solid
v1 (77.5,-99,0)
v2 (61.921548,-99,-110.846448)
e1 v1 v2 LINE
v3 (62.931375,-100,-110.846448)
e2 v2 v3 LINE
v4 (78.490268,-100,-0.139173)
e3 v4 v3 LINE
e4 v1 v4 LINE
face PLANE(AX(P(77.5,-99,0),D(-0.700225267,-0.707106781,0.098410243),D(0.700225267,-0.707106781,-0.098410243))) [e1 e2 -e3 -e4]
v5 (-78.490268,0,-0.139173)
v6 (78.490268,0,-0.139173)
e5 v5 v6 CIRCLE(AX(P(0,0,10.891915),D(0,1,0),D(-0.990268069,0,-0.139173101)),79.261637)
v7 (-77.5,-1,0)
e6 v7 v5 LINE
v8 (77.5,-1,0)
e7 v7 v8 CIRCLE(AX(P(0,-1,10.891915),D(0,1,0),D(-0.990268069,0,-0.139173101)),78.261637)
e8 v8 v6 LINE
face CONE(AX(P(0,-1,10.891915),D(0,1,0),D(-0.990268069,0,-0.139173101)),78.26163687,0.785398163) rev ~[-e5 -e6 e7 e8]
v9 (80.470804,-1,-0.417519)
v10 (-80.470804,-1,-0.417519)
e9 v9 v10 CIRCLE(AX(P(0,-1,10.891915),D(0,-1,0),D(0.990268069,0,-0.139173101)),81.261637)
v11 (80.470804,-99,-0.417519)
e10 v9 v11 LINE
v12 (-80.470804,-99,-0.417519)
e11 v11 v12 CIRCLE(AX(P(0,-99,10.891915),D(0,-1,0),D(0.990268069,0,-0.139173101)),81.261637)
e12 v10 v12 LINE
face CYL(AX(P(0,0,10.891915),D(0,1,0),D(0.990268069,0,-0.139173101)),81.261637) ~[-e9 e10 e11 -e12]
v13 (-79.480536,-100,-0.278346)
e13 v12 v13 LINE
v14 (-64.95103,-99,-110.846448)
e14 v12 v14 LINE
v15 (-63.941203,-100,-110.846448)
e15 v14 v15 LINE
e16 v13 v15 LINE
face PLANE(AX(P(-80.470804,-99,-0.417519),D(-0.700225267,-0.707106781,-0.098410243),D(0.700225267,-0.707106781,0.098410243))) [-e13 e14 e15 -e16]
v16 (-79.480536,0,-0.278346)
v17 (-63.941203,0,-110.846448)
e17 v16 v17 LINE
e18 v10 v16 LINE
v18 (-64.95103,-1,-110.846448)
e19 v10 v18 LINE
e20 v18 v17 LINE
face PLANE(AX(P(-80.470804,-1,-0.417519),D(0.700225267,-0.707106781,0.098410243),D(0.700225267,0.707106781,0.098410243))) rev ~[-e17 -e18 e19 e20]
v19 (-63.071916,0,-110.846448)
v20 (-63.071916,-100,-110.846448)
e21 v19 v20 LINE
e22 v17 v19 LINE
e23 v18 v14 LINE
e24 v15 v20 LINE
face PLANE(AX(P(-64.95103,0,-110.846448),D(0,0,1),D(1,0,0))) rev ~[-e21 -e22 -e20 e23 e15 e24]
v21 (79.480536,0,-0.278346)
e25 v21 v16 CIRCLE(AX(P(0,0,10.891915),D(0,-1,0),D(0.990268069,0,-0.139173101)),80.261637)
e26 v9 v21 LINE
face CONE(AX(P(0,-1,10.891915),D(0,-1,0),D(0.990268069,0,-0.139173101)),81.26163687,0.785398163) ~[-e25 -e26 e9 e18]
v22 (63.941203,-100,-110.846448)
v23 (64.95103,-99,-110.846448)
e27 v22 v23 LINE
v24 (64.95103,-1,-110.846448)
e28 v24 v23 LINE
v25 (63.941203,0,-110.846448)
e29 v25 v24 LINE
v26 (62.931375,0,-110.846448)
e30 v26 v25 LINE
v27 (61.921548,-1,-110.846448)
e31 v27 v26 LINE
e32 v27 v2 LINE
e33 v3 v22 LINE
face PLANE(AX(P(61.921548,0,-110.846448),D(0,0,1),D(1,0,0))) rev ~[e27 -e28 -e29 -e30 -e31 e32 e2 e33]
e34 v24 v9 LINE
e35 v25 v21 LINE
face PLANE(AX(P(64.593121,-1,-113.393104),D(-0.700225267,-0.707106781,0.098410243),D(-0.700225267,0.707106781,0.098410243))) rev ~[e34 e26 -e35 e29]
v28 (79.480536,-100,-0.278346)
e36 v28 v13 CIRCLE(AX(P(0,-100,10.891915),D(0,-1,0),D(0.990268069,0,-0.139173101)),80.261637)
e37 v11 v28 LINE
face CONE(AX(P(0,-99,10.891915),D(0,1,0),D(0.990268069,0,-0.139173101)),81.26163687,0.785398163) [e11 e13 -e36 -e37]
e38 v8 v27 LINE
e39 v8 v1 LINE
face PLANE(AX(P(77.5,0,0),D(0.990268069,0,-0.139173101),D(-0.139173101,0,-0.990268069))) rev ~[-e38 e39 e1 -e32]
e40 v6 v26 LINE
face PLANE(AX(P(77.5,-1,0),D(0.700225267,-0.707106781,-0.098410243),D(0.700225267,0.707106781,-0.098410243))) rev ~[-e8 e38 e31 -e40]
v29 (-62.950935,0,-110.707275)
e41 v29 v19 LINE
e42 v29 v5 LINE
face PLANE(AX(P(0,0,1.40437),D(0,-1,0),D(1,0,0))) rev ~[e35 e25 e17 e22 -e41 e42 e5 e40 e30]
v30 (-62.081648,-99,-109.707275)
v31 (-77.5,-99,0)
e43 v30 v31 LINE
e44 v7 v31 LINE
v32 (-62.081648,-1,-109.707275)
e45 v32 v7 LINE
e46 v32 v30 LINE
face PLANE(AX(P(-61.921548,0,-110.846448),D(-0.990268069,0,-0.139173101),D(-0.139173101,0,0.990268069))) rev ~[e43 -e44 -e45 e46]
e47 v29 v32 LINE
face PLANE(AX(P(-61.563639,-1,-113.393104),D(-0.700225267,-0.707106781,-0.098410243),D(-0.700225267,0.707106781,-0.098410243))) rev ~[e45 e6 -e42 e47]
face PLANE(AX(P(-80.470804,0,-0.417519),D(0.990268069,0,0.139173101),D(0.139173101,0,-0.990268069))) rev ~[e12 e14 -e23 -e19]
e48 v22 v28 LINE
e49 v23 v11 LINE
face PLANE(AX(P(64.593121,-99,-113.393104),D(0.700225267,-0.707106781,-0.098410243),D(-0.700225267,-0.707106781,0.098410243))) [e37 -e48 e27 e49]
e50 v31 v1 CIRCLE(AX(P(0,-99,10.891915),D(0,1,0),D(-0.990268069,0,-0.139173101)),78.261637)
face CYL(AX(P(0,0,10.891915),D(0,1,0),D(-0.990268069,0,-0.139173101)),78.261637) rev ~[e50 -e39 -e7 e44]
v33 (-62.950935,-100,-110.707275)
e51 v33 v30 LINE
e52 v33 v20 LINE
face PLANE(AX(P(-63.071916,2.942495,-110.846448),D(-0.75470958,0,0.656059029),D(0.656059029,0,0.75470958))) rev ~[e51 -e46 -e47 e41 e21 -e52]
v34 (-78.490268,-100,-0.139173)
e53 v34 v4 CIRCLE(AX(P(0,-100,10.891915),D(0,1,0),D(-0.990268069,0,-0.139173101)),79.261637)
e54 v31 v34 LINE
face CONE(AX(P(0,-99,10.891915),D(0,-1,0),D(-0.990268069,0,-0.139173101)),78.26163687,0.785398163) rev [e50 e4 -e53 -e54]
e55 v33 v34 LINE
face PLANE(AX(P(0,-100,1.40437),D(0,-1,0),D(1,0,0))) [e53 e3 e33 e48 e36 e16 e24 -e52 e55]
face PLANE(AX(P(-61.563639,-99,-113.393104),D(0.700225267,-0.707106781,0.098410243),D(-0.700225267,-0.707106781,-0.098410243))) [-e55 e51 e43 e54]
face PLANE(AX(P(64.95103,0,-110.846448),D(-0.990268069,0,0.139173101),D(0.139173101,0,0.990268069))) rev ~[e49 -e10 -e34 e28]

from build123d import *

# Parameters (mm, degrees)
F1_DEPTH     = 100
F2_T1_DEPTH  = 105.8849898869
F2_T3_DEPTH  = 114.5074829388
F2_T5_DEPTH  = 114.0858604347
F2_T7_DEPTH  = 114.5074829388
F2_T9_DEPTH  = 114.0858604347
F2_T12_ANGLE = 196
F2_T14_ANGLE = 196
F2_T16_ANGLE = 196
F2_T18_ANGLE = 196


# Not quite as in the source:
# - a fillet or chamfer that OpenCascade refuses, or shapes differently, is made with other operations: its cross-section is extruded or revolved along the edge and cut away or added


with BuildPart() as f1:
    # F0 (on Front) → F1 (new body)
    with BuildSketch(Plane.XZ):
        with BuildLine():
            Line((-61.9215476124, -110.8464484404), (-77.5, 0))
            ThreePointArc((-77.5, 0), (0, 89.1535515596), (77.5, 0))
            Line((77.5, 0), (61.9215476124, -110.8464484404))
            Line((61.9215476124, -110.8464484404), (64.95103033, -110.8464484404))
            Line((64.95103033, -110.8464484404), (80.4708042062, -0.4175193029))
            ThreePointArc((80.4708042062, -0.4175193029), (0, 92.1535515596), (-80.4708042062, -0.4175193029))
            Line((-80.4708042062, -0.4175193029), (-64.95103033, -110.8464484404))
            Line((-64.95103033, -110.8464484404), (-61.9215476124, -110.8464484404))
        make_face()
    extrude(amount=F1_DEPTH)

    # F2: chamfer of 1 on 17 edges, made by hand

    # F2_s2 → F2_t1 (cut)
    with BuildSketch(Plane.XZ.offset(-2.9424949434)):
        Polygon((-63.0719160196, -110.8464484404), (-62.0816479509, -109.7072753394), (-61.9215476124, -110.8464484404), align=None)
    extrude(amount=F2_T1_DEPTH, mode=Mode.SUBTRACT)

    # F2_s4 → F2_t3 (cut)
    with BuildSketch(Plane(origin=(14.4352522013, 0, -102.7121564484), x_dir=(0, 1, 0), z_dir=(-0.139173101, 0, 0.9902680687))):
        Polygon((-1, 76.7457753275), (0, 77.7457753275), (0, 76.7457753275), align=None)
        Polygon((-99, 76.7457753275), (-100, 77.7457753275), (-100, 76.7457753275), align=None)
    extrude(amount=F2_T3_DEPTH, mode=Mode.SUBTRACT)

    # F2_s6 → F2_t5 (cut)
    with BuildSketch(Plane(origin=(-1.5011092824, 0, 10.6809475379), x_dir=(0, 1, 0), z_dir=(0.139173101, 0, -0.9902680687))):
        Polygon((-1, -79.7457753275), (0, -78.7457753275), (0, -79.7457753275), align=None)
        Polygon((-99, -79.7457753275), (-100, -78.7457753275), (-100, -79.7457753275), align=None)
    extrude(amount=F2_T5_DEPTH, mode=Mode.SUBTRACT)

    # F2_s8 → F2_t7 (cut)
    with BuildSketch(Plane(origin=(1.5011092824, 0, 10.6809475379), x_dir=(0, 1, 0), z_dir=(-0.139173101, 0, -0.9902680687))):
        Polygon((-1, 76.7457753275), (0, 77.7457753275), (0, 76.7457753275), align=None)
        Polygon((-99, 76.7457753275), (-100, 77.7457753275), (-100, 76.7457753275), align=None)
    extrude(amount=F2_T7_DEPTH, mode=Mode.SUBTRACT)

    # F2_s10 → F2_t9 (cut)
    with BuildSketch(Plane(origin=(-14.37657369, 0, -102.2946371455), x_dir=(0, 1, 0), z_dir=(0.139173101, 0, 0.9902680687))):
        Polygon((-1, -79.7457753275), (0, -78.7457753275), (0, -79.7457753275), align=None)
        Polygon((-99, -79.7457753275), (-100, -78.7457753275), (-100, -79.7457753275), align=None)
    extrude(amount=F2_T9_DEPTH, mode=Mode.SUBTRACT)

    # F2_s11 → F2_t12 (revolve, cut)
    with BuildSketch(Plane(origin=(1.5011092824, 0, 10.6809475379), x_dir=(0, 1, 0), z_dir=(-0.139173101, 0, -0.9902680687))):
        Polygon((-1, 79.7457753275), (0, 78.7457753275), (0, 79.7457753275), align=None)
    revolve(axis=Axis((0, 0, 10.8919146894), (0, -1, 0)), revolution_arc=F2_T12_ANGLE, mode=Mode.SUBTRACT)

    # F2_s13 → F2_t14 (revolve, cut)
    with BuildSketch(Plane(origin=(1.5011092824, 0, 10.6809475379), x_dir=(0, 1, 0), z_dir=(-0.139173101, 0, -0.9902680687))):
        Polygon((-99, 79.7457753275), (-100, 78.7457753275), (-100, 79.7457753275), align=None)
    revolve(axis=Axis((0, -100, 10.8919146894), (0, -1, 0)), revolution_arc=F2_T14_ANGLE, mode=Mode.SUBTRACT)

    # F2_s15 → F2_t16 (revolve, cut)
    with BuildSketch(Plane(origin=(-1.5011092824, 0, 10.6809475379), x_dir=(0, 1, 0), z_dir=(0.139173101, 0, -0.9902680687))):
        Polygon((-1, -76.7457753275), (0, -77.7457753275), (0, -76.7457753275), align=None)
    revolve(axis=Axis((0, 0, 10.8919146894), (0, 1, 0)), revolution_arc=F2_T16_ANGLE, mode=Mode.SUBTRACT)

    # F2_s17 → F2_t18 (revolve, cut)
    with BuildSketch(Plane(origin=(-1.5011092824, 0, 10.6809475379), x_dir=(0, 1, 0), z_dir=(0.139173101, 0, -0.9902680687))):
        Polygon((-99, -76.7457753275), (-100, -77.7457753275), (-100, -76.7457753275), align=None)
    revolve(axis=Axis((0, -100, 10.8919146894), (0, 1, 0)), revolution_arc=F2_T18_ANGLE, mode=Mode.SUBTRACT)


solid = f1.part
